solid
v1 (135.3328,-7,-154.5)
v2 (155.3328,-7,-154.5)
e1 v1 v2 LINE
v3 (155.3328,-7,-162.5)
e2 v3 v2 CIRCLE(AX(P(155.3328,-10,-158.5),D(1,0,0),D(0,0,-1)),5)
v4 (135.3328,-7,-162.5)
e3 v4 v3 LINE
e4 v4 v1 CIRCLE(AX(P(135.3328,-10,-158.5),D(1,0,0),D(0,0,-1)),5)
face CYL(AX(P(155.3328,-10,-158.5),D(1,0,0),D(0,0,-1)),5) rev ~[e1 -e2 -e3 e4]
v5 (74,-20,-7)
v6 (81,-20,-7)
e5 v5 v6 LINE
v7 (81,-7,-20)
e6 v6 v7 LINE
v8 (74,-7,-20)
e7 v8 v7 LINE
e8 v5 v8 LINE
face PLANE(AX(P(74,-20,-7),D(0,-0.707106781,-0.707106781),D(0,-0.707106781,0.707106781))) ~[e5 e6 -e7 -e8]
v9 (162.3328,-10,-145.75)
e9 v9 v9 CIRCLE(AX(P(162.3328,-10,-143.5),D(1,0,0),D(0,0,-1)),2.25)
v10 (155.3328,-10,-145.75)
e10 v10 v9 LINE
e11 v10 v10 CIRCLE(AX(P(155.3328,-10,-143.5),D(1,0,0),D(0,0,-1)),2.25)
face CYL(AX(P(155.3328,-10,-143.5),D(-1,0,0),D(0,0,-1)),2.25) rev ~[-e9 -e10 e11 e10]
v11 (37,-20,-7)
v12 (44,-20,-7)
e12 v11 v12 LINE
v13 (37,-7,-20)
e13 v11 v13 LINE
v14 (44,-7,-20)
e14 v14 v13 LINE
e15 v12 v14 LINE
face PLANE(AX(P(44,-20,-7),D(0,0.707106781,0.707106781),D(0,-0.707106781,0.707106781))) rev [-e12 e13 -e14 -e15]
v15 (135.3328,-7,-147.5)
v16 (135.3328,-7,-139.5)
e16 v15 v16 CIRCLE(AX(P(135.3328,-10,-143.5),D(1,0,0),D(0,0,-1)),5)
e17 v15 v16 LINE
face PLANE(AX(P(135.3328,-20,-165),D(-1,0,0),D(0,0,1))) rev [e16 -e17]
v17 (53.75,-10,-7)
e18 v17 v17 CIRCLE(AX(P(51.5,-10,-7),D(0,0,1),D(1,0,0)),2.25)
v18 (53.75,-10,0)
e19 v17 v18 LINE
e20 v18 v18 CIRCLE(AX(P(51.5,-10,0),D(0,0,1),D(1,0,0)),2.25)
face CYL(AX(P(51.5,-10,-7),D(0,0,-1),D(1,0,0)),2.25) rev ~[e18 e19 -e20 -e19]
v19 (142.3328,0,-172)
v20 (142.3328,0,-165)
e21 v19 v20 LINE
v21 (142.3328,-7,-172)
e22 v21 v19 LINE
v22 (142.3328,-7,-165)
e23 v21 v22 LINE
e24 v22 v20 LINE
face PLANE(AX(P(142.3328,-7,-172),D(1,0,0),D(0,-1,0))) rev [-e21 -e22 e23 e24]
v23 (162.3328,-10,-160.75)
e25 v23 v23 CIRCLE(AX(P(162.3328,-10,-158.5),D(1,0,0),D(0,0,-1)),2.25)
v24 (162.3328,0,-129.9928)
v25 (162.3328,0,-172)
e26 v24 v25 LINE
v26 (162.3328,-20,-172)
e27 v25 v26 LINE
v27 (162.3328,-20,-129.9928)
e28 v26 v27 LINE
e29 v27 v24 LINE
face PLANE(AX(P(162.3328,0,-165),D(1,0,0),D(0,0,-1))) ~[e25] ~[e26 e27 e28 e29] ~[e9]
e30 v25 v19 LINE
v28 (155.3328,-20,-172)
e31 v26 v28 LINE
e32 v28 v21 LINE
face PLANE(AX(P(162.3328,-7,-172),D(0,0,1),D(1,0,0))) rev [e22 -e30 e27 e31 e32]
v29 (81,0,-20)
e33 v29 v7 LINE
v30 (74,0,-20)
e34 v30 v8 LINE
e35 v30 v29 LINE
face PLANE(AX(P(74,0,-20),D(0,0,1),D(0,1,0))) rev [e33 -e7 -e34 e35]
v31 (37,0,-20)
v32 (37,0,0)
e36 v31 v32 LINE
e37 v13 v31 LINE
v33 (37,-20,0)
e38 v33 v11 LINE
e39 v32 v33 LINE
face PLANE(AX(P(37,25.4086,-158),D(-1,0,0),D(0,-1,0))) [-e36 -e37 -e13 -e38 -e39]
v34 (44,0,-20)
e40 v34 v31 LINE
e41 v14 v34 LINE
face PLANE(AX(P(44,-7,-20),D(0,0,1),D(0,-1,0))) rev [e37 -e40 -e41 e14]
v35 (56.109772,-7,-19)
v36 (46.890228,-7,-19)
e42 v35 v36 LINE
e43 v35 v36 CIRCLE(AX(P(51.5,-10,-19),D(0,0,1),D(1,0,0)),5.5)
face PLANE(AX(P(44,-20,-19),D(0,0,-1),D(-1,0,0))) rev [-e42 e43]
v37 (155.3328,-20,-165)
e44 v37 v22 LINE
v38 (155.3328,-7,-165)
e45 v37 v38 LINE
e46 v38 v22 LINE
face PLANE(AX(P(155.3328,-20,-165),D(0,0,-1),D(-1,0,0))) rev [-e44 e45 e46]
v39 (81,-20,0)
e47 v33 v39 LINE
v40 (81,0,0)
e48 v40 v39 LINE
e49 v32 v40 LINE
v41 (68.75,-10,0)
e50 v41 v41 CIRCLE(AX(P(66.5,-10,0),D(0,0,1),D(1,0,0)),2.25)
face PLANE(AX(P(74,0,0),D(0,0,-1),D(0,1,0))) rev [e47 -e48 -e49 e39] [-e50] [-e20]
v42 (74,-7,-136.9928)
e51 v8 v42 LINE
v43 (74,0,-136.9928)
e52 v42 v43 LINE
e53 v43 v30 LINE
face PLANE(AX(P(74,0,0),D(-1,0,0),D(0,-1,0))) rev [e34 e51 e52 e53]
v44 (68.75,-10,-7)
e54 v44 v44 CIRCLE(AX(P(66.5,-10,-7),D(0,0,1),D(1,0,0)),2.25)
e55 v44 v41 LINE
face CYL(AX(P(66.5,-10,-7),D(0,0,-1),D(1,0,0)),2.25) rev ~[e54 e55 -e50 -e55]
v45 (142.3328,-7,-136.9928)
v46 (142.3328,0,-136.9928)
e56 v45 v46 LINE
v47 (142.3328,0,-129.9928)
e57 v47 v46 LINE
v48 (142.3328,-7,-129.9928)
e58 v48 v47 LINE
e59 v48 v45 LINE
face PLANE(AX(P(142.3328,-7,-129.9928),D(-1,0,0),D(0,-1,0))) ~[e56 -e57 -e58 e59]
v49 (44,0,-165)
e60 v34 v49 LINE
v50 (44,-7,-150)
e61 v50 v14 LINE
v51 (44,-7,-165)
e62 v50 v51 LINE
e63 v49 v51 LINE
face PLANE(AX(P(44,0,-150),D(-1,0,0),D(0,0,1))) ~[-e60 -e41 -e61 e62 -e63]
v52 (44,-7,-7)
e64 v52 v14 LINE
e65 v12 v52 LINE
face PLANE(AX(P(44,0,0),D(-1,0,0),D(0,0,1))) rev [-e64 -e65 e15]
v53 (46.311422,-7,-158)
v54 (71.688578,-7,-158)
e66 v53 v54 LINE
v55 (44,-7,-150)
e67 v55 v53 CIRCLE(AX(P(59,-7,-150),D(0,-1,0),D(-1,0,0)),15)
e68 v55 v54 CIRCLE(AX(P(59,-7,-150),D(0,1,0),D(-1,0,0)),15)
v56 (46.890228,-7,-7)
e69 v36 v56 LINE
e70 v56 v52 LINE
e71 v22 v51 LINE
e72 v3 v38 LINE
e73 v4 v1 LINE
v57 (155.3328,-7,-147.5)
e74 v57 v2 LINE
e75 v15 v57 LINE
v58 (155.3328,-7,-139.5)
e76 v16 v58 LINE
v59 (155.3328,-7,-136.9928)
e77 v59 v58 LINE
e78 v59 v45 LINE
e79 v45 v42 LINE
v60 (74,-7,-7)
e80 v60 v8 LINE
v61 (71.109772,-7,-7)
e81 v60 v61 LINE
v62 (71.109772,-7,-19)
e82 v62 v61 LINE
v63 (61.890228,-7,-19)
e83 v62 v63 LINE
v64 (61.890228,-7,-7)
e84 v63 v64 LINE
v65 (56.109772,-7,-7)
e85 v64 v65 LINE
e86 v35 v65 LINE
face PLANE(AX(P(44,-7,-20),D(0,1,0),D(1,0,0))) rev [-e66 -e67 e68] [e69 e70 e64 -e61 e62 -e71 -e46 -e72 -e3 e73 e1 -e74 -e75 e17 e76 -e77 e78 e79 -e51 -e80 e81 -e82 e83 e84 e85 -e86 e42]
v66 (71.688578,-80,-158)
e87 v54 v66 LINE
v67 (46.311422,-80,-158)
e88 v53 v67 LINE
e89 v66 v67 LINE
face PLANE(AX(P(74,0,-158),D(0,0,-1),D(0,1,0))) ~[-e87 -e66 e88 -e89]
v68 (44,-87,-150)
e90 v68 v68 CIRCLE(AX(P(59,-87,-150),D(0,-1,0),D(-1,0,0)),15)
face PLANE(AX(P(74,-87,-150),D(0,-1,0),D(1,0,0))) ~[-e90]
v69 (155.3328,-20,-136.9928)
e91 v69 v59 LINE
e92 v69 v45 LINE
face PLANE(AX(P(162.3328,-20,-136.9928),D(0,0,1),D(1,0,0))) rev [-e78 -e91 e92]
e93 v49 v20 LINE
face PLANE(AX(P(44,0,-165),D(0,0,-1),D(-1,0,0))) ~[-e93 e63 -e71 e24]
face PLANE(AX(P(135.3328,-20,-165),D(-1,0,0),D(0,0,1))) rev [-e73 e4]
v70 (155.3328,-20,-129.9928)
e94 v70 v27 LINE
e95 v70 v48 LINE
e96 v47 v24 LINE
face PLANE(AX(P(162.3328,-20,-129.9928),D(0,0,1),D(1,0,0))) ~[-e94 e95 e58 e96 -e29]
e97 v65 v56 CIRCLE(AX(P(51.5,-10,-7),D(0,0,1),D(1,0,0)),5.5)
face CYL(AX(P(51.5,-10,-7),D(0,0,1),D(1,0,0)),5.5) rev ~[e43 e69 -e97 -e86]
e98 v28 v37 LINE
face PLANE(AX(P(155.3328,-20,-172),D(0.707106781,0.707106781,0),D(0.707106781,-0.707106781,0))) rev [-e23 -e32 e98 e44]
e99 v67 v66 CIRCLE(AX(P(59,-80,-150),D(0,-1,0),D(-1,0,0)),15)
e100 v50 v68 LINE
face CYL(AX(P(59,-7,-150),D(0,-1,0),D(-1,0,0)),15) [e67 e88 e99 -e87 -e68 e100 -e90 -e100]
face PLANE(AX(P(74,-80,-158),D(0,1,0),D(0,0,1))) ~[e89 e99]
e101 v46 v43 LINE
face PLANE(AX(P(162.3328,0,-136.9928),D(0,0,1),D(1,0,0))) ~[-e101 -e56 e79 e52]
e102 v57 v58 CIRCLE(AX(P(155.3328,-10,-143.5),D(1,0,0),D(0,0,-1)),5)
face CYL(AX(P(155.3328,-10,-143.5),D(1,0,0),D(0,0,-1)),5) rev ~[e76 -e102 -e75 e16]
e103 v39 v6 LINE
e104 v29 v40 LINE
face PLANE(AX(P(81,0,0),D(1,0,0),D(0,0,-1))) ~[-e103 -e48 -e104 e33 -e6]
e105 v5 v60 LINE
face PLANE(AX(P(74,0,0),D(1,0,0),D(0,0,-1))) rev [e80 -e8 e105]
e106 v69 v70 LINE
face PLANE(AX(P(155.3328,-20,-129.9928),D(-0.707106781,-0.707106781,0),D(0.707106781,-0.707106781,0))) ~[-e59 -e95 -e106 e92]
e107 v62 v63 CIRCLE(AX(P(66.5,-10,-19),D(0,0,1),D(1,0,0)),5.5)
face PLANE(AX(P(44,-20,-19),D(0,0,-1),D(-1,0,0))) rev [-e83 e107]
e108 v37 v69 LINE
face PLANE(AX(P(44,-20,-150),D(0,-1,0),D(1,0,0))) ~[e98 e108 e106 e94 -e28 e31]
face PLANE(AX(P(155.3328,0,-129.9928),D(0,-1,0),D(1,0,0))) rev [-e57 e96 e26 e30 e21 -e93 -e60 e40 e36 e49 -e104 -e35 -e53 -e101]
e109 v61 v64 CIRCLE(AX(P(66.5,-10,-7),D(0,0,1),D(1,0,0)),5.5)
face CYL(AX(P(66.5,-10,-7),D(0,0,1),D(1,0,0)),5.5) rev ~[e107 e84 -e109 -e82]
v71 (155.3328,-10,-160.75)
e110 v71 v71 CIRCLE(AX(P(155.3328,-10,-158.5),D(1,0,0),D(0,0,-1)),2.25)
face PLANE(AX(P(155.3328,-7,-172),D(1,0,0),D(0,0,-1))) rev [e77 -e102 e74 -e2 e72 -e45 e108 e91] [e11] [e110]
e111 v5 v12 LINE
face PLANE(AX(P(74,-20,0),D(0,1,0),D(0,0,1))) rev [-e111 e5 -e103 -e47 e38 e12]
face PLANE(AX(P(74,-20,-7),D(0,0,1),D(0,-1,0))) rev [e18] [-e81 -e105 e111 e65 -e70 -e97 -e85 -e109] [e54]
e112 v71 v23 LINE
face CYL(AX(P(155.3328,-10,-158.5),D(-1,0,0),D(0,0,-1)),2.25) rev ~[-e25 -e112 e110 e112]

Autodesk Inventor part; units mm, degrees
ref_plane "YZ Plane" through (0, 0, 0) normal (1, 0, 0) x (0, 1, 0)
ref_plane "XZ Plane" through (0, 0, 0) normal (0, 1, 0) x (-1, 0, 0)
ref_plane "XY Plane" through (0, 0, 0) normal (0, 0, 1) x (1, 0, 0)
sketch "Sketch1" plane through (0, 0, 0) normal (1, 0, 0) x (0, 1, 0)
  line L0 (0, 0) -> (-20, 0)
  line L1 (-20, 0) -> (-20, -7)
  line L2 (-20, -7) -> (0, -7)
  line L3 (0, -7) -> (0, 0)
  line L4 (0, -7) -> (-7, -7)
  line L5 (-7, -7) -> (-7, -150)
  line L6 (-7, -150) -> (0, -150)
  line L7 (0, -150) -> (0, -7)
  dimension "d0" = 7
  dimension "d1" = 20
  dimension "d2" = 7
  dimension "d3" = 150
extrude "Extrusion1" add sketch "Sketch1" along normal blind 30
sketch "Sketch2" plane through (0, -7, -150) normal (0, -1, 0) x (1, 0, 0)
  line L0 (0, 0) -> (30, 0) projected
  circle A0 centre (15, 0) radius 15
  point P0 (0, 150)
extrude "Extrusion2" add sketch "Sketch2" along normal blind 80 and the other way blind 7
sketch "Sketch3" plane through (0, -20, -7) normal (0, 0, -1) x (-1, 0, 0)
  circle A0 centre (-7.5, 10) radius 2.25
  circle A1 centre (-22.5, 10) radius 2.25
  line L0 (0, 0) -> (-30, 0) projected
  line L1 (-30, 0) -> (-30, 13) projected
  point P0 (0, 20)
  dimension "d10" = 10
  dimension "d11" = 4.5
  dimension "d12" = 4.5
  dimension "d13" = 10
  dimension "d14" = 15
  dimension "d15" = 7.5
sketch "Sketch4" plane through (30, 0, 0) normal (1, 0, 0) x (0, 0, -1)
  line L0 (150, 0) -> (0, 0) projected
  line L1 (0, 0) -> (0, -20) projected
  line L2 (0, -20) -> (7, -20) projected
  line L3 (7, -20) -> (7, -7) projected
  line L4 (7, -7) -> (150, -7) projected
  line L5 (150, -7) -> (150, 0) projected
  line L6 (7, -20) -> (7, -7) projected
  line L7 (7, -20) -> (20, -7)
  line L8 (7, -7) -> (150, -7) projected
  line L9 (20, -7) -> (20, 0)
  dimension "d16" = 13
extrude "Extrusion3" add sketch "Sketch4" along normal blind 7 contours L9 L4 L3 L2 L1 L0 | L7 L3 L4
extrude "Extrusion4" cut sketch "Sketch3" against normal blind 7
sketch "Sketch5" plane through (0, 0, 0) normal (-1, 0, 0) x (0, 0, 1)
  line L0 (-150, 0) -> (0, 0) projected
  line L1 (-150, -7) -> (-150, 0) projected
  line L2 (-7, -7) -> (-150, -7) projected
  line L3 (-7, -20) -> (-7, -7) projected
  line L4 (0, -20) -> (-7, -20) projected
  line L5 (0, 0) -> (0, -20) projected
  line L6 (-7, -20) -> (-20, -7) projected
  line L7 (-7, -20) -> (-20, -7)
  line L8 (-20, 0) -> (-20, -7) projected
  line L9 (-20, -7) -> (-20, 0)
extrude "Extrusion5" add sketch "Sketch5" along normal blind 7 contours L0 L5 L4 L3 L2 L8 | L2 L3 L6
sketch "Sketch6" plane through (30, -20, -7) normal (0, 0, -1) x (-1, 0, 0)
  circle A0 centre (7.5, 10) radius 2.25 projected
  circle A1 centre (22.5, 10) radius 2.25 projected
  circle A2 centre (7.5, 10) radius 5.5
  circle A3 centre (22.5, 10) radius 5.5
  point P0 (30, 20)
  dimension "d23" = 11
  dimension "d24" = 11
extrude "Extrusion6" cut sketch "Sketch6" along normal blind 12
sketch "Sketch7" plane through (0, 0, 0) normal (-1, 0, 0) x (0, 0, 1)
  line L0 (-193.0937, 8.1233) -> (-158, 8.1233)
  line L1 (-158, 8.1233) -> (-158, -80)
  line L2 (-158, -80) -> (-193.0937, -80)
  line L3 (-193.0937, -80) -> (-193.0937, 8.1233)
  line L4 (-150, 0) -> (-165, 0) projected
  point P0 (0, 0)
  dimension "d27" = 80
  dimension "d28" = 7
extrude "Extrusion7" cut sketch "Sketch7" against normal blind 72
sketch "Sketch8" plane through (30, 0, -20) normal (0, 1, 0) x (1, 0, 0)
  line L0 (0, 145) -> (-118.3328, 145)
  line L1 (-118.3328, 145) -> (-118.3328, 116.9928)
  line L2 (-118.3328, 116.9928) -> (0, 116.9928)
  line L3 (0, 116.9928) -> (0, 145)
  line L4 (0, 130) -> (0, 0) projected
  arc A0 (-2.3114, 138) -> (-27.6886, 138) centre (-15, 130) ccw projected
  line L5 (-138.3328, 520) -> (-138.3328, -40) projected
  point P0 (-30, -20)
  dimension "d31" = 0
  dimension "d32" = 15
  dimension "d33" = 20
extrude "Extrusion8" add sketch "Sketch8" against normal blind 7
sketch "Sketch9" plane through (30, -7, -150) normal (0, -1, 0) x (1, 0, 0)
  line L0 (-118.3328, -22) -> (-111.3328, -22)
  line L1 (-111.3328, -22) -> (-111.3328, 20.0072)
  line L2 (-111.3328, 20.0072) -> (-118.3328, 20.0072)
  line L3 (-118.3328, 20.0072) -> (-118.3328, -22)
  line L4 (-118.3328, 13.0072) -> (-118.3328, -15) projected
  line L5 (-30, 13.0072) -> (-118.3328, 13.0072) projected
  line L6 (-118.3328, -15) -> (0, -15) projected
  point P0 (-30, 150)
  dimension "d36" = 7
  dimension "d37" = 0
  dimension "d38" = 7
  dimension "d39" = 7
extrude "Extrusion9" add sketch "Sketch9" along normal blind 13 and the other way blind 7
sketch "Sketch10" plane through (-81.3328, -20, -172) normal (0, 0, -1) x (-1, 0, 0)
  line L0 (7, 0) -> (0, 0) projected
  line L1 (0, 0) -> (-20, 20)
  line L2 (0, 20) -> (-81.3328, 20) projected
  line L3 (0, 20) -> (0, 0) projected
  line L4 (0, 13) -> (-111.3328, 13) projected
  line L5 (-13, 13) -> (-13, 20)
  dimension "d44" = 45
extrude "Extrusion10" add sketch "Sketch10" against normal blind 7 contours L1 L4 L3 | L5 L2 L3 L4
sketch "Sketch11" plane through (-88.3328, -20, -129.9928) normal (0, 0, 1) x (1, 0, 0)
  line L0 (7, 0) -> (7, 13) projected
  line L1 (20, 13) -> (27, 20) projected
  line L2 (7, 0) -> (20, 13)
  line L3 (20, 13) -> (20, 20)
  line L4 (0, 20) -> (20, 20) projected
  line L5 (7, 20) -> (7, 13)
  line L6 (7, 20) -> (7, 13) projected
  line L7 (7, 20) -> (20, 20)
  point P0 (88.3328, 20)
extrude "Extrusion11" add sketch "Sketch11" against normal blind 7
sketch "Sketch13" plane through (-81.3328, -20, -165) normal (1, 0, 0) x (0, 0, -1)
  circle A0 centre (-6.5, 10) radius 2.25
  circle A1 centre (-21.5, 10) radius 2.25
  line L0 (0, 0) -> (-28.0072, 0) projected
  line L1 (-158, 12.25) -> (-158, 7.75) projected
  line L2 (-158, 12.25) -> (-158, 7.75) projected
  line L3 (0, 0) -> (0, 13) projected
  line L4 (-28.0072, 13) -> (-28.0072, 0) projected
  point P0 (-165, 20)
  dimension "d49" = 10
  dimension "d50" = 10
  dimension "d51" = 15
  dimension "d52" = 6.5
  dimension "d53" = 6.5072
  dimension "d54" = 4.5
  dimension "d55" = 4.5
extrude "Extrusion12" cut sketch "Sketch13" against normal blind 7
sketch "Sketch15" plane through (-81.3328, -20, -165) normal (1, 0, 0) x (0, 0, -1)
  circle A0 centre (-6.5, 10) radius 2.25 projected
  circle A1 centre (-6.5, 10) radius 5
  circle A2 centre (-21.5, 10) radius 2.25 projected
  circle A3 centre (-21.5, 10) radius 5
  point P0 (-165, 20)
  dimension "d58" = 10
  dimension "d59" = 10
extrude "Extrusion13" cut sketch "Sketch15" along normal blind 20 contours A1 | A2 | A3
mirror "Mirror1" about plane through (37, -10, -10) normal (1, 0, 0) of "Extrusion13", "Extrusion12", "Extrusion11", "Extrusion10", "Extrusion9", "Extrusion8", "Extrusion7", "Extrusion6", "Extrusion5", "Extrusion4", "Extrusion3", "Extrusion2", "Extrusion1"
sketch "Sketch16" plane through (27.6886, -80, -158) normal (0, 0, -1) x (-1, 0, 0)
  line L0 (34.6886, 80) -> (-53.3114, 80) projected
  line L1 (-9.3114, 80) -> (-9.3114, -30.4412)
  line L2 (-9.3114, -30.4412) -> (154.0153, -30.4412)
  line L3 (154.0153, -30.4412) -> (154.0153, 105.4086)
  line L4 (154.0153, 105.4086) -> (-9.3114, 105.4086)
  line L5 (-9.3114, 105.4086) -> (-9.3114, -30.4412)
  point P0 (27.6886, 80)
extrude "Extrusion14" cut sketch "Sketch16" along normal mid plane 400
equation "\"d12\" = d11"
equation "\"d13\" = d10"
properties part number "SpoolHolder" material "PET Plastic"
